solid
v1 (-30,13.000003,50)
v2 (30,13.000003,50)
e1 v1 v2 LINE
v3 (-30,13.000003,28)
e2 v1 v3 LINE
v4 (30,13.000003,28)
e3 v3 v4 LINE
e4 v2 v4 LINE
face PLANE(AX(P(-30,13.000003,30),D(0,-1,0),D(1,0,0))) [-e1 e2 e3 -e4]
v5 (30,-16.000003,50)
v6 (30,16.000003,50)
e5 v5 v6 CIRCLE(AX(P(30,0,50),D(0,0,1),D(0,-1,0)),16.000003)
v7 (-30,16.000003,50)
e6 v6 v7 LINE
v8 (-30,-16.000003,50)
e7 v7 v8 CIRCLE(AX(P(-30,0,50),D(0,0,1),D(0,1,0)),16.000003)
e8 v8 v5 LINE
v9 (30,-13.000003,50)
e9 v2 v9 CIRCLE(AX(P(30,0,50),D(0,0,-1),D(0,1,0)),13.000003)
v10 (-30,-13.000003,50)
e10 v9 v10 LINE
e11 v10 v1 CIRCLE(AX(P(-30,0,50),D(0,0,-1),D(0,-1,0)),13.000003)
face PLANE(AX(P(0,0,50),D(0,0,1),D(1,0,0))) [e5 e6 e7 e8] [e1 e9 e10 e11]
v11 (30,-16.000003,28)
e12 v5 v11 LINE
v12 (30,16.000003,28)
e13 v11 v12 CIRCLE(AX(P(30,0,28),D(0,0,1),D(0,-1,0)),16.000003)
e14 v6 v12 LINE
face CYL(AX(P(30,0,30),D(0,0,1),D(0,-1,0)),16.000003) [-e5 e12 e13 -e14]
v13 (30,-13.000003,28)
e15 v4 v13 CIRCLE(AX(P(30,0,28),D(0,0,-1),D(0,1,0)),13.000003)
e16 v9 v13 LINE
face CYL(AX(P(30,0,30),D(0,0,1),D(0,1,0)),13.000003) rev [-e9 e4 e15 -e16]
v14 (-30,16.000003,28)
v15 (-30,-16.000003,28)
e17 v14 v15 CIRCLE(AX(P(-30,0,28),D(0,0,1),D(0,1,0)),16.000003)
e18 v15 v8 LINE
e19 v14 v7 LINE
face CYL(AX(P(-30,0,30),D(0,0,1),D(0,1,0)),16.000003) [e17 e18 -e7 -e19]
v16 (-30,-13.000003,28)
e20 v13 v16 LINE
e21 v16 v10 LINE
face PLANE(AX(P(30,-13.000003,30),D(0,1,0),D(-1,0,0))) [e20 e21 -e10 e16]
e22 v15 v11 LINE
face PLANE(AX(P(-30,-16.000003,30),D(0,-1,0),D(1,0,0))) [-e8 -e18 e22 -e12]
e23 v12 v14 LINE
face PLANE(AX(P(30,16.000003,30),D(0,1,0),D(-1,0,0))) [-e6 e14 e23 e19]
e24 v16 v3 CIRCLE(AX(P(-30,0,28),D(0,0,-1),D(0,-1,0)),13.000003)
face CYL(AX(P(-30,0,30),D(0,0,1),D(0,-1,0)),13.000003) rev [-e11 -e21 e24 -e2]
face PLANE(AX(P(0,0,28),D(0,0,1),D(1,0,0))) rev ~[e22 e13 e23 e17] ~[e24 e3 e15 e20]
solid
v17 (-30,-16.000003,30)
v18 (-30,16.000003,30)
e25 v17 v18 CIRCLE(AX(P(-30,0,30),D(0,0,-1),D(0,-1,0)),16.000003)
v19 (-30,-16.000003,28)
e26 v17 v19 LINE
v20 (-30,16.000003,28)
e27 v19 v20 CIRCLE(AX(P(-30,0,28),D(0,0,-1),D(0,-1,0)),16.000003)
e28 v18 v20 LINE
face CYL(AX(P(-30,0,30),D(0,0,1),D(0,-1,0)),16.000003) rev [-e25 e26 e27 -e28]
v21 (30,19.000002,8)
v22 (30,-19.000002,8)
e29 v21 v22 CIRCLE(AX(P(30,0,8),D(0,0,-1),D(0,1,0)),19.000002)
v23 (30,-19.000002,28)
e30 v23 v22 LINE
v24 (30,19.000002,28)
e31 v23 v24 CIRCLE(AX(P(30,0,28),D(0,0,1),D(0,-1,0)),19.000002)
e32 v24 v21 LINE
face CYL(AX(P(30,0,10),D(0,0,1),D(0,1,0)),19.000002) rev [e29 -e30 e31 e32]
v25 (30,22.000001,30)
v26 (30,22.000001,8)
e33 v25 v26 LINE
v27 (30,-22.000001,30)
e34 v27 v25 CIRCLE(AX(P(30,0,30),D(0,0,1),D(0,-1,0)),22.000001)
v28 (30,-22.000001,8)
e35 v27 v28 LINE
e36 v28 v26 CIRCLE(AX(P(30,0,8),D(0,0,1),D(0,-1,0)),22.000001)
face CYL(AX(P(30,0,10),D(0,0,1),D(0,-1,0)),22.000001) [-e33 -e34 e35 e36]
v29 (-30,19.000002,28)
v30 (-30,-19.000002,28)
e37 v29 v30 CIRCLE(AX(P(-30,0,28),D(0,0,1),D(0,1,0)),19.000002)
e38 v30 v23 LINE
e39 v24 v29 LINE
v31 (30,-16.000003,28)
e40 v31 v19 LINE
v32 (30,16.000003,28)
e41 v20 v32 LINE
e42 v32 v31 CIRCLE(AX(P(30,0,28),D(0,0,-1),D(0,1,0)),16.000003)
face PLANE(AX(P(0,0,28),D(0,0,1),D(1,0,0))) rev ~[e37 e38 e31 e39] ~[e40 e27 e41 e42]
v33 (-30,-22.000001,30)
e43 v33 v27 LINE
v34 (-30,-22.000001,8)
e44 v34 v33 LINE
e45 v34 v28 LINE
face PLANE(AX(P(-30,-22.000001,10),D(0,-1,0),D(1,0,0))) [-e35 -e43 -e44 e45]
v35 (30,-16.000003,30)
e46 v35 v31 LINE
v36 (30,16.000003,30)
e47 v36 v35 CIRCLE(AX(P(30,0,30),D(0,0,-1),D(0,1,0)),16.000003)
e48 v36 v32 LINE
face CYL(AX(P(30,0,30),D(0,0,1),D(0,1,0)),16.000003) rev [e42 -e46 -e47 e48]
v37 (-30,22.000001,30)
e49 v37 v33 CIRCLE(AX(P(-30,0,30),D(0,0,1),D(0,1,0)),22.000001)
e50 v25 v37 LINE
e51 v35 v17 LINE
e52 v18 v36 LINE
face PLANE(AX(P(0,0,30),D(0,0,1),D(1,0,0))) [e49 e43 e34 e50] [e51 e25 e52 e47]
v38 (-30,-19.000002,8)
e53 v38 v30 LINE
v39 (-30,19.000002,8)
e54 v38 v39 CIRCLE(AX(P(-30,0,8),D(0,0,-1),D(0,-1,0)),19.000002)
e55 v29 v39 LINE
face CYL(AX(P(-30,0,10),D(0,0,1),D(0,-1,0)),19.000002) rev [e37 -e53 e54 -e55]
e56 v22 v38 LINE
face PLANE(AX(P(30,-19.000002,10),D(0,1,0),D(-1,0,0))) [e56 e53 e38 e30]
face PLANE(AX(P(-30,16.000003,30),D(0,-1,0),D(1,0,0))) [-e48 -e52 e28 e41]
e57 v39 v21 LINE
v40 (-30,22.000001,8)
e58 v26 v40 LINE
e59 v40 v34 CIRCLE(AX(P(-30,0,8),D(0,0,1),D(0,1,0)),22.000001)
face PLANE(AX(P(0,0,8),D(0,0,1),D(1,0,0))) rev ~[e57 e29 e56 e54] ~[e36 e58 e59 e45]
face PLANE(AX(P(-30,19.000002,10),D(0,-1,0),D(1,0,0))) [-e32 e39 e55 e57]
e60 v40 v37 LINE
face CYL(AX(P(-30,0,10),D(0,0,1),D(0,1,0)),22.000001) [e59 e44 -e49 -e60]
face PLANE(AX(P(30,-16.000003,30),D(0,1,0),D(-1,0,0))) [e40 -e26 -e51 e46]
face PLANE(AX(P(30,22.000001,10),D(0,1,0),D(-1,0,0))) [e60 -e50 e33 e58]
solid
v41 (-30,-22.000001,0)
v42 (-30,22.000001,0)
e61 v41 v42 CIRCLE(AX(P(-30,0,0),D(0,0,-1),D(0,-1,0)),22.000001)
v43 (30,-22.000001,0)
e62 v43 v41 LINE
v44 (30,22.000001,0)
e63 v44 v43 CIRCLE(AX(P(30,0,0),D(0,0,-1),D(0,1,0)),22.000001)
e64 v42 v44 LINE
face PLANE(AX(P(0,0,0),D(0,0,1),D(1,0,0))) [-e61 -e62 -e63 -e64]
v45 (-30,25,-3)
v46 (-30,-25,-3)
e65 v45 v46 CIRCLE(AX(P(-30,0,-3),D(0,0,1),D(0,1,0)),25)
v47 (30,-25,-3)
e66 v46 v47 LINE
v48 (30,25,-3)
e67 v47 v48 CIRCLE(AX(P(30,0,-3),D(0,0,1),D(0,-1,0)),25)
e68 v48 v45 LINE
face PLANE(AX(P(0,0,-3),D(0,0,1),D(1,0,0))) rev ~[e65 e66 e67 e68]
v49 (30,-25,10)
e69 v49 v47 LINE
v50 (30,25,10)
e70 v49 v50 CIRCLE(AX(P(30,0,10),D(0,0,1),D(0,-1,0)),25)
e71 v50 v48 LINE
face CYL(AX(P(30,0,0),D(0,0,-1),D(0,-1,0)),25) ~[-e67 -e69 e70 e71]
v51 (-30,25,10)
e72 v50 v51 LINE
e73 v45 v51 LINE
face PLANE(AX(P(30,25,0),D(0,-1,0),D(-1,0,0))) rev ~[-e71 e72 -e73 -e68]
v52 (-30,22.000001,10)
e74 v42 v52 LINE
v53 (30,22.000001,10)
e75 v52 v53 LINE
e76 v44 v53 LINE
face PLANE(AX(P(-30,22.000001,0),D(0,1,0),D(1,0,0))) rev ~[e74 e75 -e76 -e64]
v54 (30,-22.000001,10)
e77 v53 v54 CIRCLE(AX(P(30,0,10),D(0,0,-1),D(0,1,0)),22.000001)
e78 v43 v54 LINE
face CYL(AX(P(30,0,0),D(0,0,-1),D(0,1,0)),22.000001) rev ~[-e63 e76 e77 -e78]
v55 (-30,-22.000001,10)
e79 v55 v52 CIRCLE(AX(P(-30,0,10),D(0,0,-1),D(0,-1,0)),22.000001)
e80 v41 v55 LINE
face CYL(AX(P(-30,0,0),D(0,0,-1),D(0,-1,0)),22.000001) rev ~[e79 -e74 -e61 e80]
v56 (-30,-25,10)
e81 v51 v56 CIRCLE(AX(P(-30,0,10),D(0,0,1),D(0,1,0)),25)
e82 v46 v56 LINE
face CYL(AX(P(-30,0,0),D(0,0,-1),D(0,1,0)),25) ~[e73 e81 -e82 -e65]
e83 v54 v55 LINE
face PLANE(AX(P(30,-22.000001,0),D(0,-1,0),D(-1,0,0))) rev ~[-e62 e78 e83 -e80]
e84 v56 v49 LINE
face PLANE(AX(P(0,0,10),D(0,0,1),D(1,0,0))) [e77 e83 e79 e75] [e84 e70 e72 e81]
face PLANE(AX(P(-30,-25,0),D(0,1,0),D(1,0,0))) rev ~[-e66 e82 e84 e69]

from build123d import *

# Parameters (mm, degrees)
F1_DEPTH      = 3
F2_DEPTH      = 10
F4_DEPTH      = 20
F4_DEPTH_BACK = 2
F6_DEPTH      = 20
F6_DEPTH_BACK = 2
F7_DEPTH      = 2


with BuildPart() as f1:
    # F0 (on Top) → F1 (new body)
    with BuildSketch(Plane.XY):
        with BuildLine():
            Line((30, 25), (-30, 25))
            ThreePointArc((-30, 25), (-55, 0), (-30, -25))
            Line((-30, -25), (30, -25))
            ThreePointArc((30, -25), (55, 0), (30, 25))
        make_face()
        with BuildLine():
            ThreePointArc((-30, -22.0000010729), (-52.0000010729, 0), (-30, 22.0000010729))
            Line((-30, 22.0000010729), (30, 22.0000010729))
            ThreePointArc((30, 22.0000010729), (52.0000010729, 0), (30, -22.0000010729))
            Line((30, -22.0000010729), (-30, -22.0000010729))
        make_face(mode=Mode.SUBTRACT)
        with BuildLine():
            Line((30, 22.0000010729), (-30, 22.0000010729))
            ThreePointArc((-30, 22.0000010729), (-52.0000010729, 0), (-30, -22.0000010729))
            Line((-30, -22.0000010729), (30, -22.0000010729))
            ThreePointArc((30, -22.0000010729), (52.0000010729, 0), (30, 22.0000010729))
        make_face()
    extrude(amount=-F1_DEPTH)

    # F0 (on Top) → F2 (join)
    with BuildSketch(Plane.XY):
        with BuildLine():
            Line((30, 25), (-30, 25))
            ThreePointArc((-30, 25), (-55, 0), (-30, -25))
            Line((-30, -25), (30, -25))
            ThreePointArc((30, -25), (55, 0), (30, 25))
        make_face()
        with BuildLine():
            ThreePointArc((-30, -22.0000010729), (-52.0000010729, 0), (-30, 22.0000010729))
            Line((-30, 22.0000010729), (30, 22.0000010729))
            ThreePointArc((30, 22.0000010729), (52.0000010729, 0), (30, -22.0000010729))
            Line((30, -22.0000010729), (-30, -22.0000010729))
        make_face(mode=Mode.SUBTRACT)
    extrude(amount=F2_DEPTH)


with BuildPart() as f4:
    # F3 (on face) → F4 (new body, two sides)
    with BuildSketch(Plane.XY.offset(10)) as f4_sk:
        with BuildLine():
            Line((30, 22.0000010729), (-30, 22.0000010729))
            ThreePointArc((-30, 22.0000010729), (-52.0000010729, 0), (-30, -22.0000010729))
            Line((-30, -22.0000010729), (30, -22.0000010729))
            ThreePointArc((30, -22.0000010729), (52.0000010729, 0), (30, 22.0000010729))
        make_face()
        with BuildLine():
            ThreePointArc((-30, -19.0000024438), (-49.0000024438, 0), (-30, 19.0000024438))
            Line((-30, 19.0000024438), (30, 19.0000024438))
            ThreePointArc((30, 19.0000024438), (49.0000024438, 0), (30, -19.0000024438))
            Line((30, -19.0000024438), (-30, -19.0000024438))
        make_face(mode=Mode.SUBTRACT)
    extrude(amount=F4_DEPTH)
    extrude(f4_sk.sketch, amount=-F4_DEPTH_BACK)

    # F5 (on face) → F7 (join)
    with BuildSketch(Plane.XY.offset(30)):
        with BuildLine():
            Line((30, 19.0000024438), (-30, 19.0000024438))
            ThreePointArc((-30, 19.0000024438), (-49.0000024438, 0), (-30, -19.0000024438))
            Line((-30, -19.0000024438), (30, -19.0000024438))
            ThreePointArc((30, -19.0000024438), (49.0000024438, 0), (30, 19.0000024438))
        make_face()
        with BuildLine():
            ThreePointArc((-30, -16.0000026226), (-46.0000026226, 0), (-30, 16.0000026226))
            Line((-30, 16.0000026226), (30, 16.0000026226))
            ThreePointArc((30, 16.0000026226), (46.0000026226, 0), (30, -16.0000026226))
            Line((30, -16.0000026226), (-30, -16.0000026226))
        make_face(mode=Mode.SUBTRACT)
    extrude(amount=-F7_DEPTH)


with BuildPart() as f6:
    # F5 (on face) → F6 (new body, two sides)
    with BuildSketch(Plane.XY.offset(30)) as f6_sk:
        with BuildLine():
            Line((30, 16.0000026226), (-30, 16.0000026226))
            ThreePointArc((-30, 16.0000026226), (-46.0000026226, 0), (-30, -16.0000026226))
            Line((-30, -16.0000026226), (30, -16.0000026226))
            ThreePointArc((30, -16.0000026226), (46.0000026226, 0), (30, 16.0000026226))
        make_face()
        with BuildLine():
            ThreePointArc((-30, -13.0000026226), (-43.0000026226, 0), (-30, 13.0000026226))
            Line((-30, 13.0000026226), (30, 13.0000026226))
            ThreePointArc((30, 13.0000026226), (43.0000026226, 0), (30, -13.0000026226))
            Line((30, -13.0000026226), (-30, -13.0000026226))
        make_face(mode=Mode.SUBTRACT)
    extrude(amount=F6_DEPTH)
    extrude(f6_sk.sketch, amount=-F6_DEPTH_BACK)


solid = Compound([f1.part, f4.part, f6.part])
